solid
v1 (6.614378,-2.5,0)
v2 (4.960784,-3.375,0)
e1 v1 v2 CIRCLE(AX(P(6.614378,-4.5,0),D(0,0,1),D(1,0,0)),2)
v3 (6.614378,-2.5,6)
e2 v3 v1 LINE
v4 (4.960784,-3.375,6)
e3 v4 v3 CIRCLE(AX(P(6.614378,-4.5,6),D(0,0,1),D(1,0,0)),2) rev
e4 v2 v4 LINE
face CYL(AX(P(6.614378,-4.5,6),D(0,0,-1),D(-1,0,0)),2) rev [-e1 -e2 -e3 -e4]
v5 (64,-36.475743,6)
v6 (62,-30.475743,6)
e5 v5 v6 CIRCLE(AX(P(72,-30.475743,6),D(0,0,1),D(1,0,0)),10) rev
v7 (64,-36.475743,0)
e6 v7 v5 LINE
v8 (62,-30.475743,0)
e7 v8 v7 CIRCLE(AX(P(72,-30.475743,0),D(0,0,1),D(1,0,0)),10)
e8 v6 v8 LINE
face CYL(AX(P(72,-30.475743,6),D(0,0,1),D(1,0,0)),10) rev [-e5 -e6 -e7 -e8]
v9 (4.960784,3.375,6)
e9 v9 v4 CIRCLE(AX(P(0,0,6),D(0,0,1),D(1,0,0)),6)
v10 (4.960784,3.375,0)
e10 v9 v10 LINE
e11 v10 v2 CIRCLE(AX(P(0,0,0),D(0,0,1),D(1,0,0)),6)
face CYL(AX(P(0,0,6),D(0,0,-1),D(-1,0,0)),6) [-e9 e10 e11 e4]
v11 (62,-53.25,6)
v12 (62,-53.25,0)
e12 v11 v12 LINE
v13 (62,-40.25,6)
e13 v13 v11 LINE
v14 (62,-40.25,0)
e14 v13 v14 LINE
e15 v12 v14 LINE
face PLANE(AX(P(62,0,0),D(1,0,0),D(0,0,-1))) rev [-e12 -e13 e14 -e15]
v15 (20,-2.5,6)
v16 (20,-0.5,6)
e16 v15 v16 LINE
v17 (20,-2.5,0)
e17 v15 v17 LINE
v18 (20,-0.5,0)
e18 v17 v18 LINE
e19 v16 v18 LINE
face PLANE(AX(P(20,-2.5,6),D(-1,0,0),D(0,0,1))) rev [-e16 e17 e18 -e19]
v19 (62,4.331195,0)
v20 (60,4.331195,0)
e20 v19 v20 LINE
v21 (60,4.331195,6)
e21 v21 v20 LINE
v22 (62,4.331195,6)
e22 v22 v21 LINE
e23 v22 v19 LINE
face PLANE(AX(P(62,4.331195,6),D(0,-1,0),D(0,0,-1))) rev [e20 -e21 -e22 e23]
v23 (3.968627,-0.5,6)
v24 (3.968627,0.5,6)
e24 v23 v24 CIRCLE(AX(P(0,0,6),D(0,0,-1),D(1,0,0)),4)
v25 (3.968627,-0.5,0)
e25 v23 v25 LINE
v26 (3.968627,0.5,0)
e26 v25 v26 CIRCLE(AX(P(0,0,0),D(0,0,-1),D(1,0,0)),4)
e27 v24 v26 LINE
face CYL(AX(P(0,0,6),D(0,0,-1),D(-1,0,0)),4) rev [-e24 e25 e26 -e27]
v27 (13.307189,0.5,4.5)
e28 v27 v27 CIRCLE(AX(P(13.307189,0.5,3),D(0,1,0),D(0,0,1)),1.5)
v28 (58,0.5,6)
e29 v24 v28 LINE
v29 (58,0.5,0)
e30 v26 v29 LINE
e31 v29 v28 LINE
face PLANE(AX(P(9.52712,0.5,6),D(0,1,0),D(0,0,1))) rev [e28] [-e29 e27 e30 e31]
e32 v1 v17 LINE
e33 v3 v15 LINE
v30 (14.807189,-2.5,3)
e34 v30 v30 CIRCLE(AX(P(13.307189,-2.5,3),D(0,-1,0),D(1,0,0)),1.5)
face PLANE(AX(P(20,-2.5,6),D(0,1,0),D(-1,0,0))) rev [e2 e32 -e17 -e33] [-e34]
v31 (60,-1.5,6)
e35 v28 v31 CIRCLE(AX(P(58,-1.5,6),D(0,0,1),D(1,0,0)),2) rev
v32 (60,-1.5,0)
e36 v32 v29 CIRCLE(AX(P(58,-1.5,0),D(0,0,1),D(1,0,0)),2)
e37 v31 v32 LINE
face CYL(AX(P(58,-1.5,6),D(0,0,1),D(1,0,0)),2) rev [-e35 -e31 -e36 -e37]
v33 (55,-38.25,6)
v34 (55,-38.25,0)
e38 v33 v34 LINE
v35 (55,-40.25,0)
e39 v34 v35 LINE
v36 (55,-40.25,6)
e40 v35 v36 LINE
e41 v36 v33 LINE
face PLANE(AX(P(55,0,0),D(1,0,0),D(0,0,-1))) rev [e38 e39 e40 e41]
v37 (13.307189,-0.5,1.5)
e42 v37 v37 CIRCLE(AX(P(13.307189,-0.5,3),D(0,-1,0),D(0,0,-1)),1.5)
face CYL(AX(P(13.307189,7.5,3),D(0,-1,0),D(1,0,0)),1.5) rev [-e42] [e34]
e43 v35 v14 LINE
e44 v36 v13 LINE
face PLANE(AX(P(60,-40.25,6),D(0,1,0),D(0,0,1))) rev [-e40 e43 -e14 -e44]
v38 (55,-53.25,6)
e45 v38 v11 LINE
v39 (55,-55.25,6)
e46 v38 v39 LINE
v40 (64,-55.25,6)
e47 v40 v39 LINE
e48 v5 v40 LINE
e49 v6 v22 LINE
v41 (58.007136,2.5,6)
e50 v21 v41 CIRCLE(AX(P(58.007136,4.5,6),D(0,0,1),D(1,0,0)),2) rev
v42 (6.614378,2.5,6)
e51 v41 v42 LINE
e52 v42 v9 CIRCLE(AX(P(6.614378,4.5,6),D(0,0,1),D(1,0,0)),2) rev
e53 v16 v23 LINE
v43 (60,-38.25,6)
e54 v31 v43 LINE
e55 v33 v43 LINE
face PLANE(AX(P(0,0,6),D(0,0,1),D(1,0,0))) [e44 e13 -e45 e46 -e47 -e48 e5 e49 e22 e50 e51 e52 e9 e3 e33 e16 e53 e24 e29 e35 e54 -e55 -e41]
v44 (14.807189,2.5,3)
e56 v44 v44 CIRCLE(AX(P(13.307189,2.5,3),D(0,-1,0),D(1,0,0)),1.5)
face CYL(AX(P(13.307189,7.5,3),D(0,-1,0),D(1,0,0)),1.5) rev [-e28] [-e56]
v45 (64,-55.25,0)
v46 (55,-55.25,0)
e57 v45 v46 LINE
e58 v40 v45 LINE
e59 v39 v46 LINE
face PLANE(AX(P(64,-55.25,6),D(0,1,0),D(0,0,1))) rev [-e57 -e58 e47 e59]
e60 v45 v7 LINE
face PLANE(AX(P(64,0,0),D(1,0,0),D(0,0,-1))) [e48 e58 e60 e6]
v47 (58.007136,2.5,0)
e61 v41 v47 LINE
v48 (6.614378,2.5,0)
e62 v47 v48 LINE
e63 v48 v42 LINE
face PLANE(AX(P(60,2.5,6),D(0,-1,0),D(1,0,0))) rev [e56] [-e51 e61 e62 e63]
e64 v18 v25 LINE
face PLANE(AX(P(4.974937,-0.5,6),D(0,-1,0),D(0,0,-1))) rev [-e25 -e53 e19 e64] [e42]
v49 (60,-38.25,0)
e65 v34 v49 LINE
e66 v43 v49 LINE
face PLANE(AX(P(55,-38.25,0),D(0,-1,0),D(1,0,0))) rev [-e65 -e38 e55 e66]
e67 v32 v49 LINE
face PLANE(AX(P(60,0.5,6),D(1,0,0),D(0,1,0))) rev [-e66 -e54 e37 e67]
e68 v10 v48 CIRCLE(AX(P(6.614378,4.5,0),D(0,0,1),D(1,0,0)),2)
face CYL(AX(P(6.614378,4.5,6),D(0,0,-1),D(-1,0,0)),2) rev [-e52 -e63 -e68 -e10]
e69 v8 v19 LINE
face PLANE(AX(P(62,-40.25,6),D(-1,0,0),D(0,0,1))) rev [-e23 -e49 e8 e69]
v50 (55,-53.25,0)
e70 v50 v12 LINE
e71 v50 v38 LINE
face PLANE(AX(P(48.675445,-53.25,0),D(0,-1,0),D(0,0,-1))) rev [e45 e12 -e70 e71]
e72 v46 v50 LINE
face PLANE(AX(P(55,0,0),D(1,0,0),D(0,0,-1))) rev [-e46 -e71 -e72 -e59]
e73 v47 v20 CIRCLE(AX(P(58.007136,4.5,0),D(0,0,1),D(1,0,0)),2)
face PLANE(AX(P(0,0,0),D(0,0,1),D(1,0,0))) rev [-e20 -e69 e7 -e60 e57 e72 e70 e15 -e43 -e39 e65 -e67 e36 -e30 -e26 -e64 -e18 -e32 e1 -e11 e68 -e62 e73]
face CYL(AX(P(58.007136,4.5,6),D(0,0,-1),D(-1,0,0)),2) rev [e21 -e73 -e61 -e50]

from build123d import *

# Parameters (mm, degrees)
BOSS_EXTRUDE1_DEPTH = 6
FILLET1_R           = 2
SKETCH2_R           = 1.5
CUT_EXTRUDE1_DEPTH  = 10
SKETCH3_W           = 6
SKETCH3_H           = 18.774257397
BOSS_EXTRUDE2_DEPTH = 2
FILLET2_R           = 10
SKETCH4_W           = 6
SKETCH4_H           = 2
BOSS_EXTRUDE3_DEPTH = 5
SKETCH5_W           = 6
SKETCH5_H           = 2
BOSS_EXTRUDE4_DEPTH = 7


with BuildPart() as part:
    # Sketch1 → Boss-Extrude1 (new body)
    with BuildSketch(Plane.XY):
        with BuildLine():
            Line((4.974937186, 0.5), (9.527119886, 0.5))
            Line((9.527119886, 0.5), (60, 0.5))
            Line((60, 0.5), (60, -40.25))
            Line((60, -40.25), (62, -40.25))
            Line((62, -40.25), (62, 4.331195296))
            Line((62, 4.331195296), (60, 4.331195296))
            Line((60, 4.331195296), (60, 2.5))
            Line((60, 2.5), (5.454356057, 2.5))
            ThreePointArc((5.454356057, 2.5), (-6, 0), (5.454356057, -2.5))
            Line((5.454356057, -2.5), (20, -2.5))
            Line((20, -2.5), (20, -0.5))
            Line((20, -0.5), (4.974937186, -0.5))
            Line((4.974937186, -0.5), (3.968626967, -0.5))
            ThreePointArc((3.968626967, -0.5), (-4, 0), (3.968626967, 0.5))
            Line((3.968626967, 0.5), (4.974937186, 0.5))
        make_face()
    extrude(amount=BOSS_EXTRUDE1_DEPTH)

    # Fillet1
    # the kernel refuses this fillet: 2 mm, written as the material it adds along each edge
    with BuildSketch(Plane(origin=(5.454356057, -2.5, 0), x_dir=(1, 0, 0), z_dir=(0, 0, 1))) as fillet1_piece_1:
        with BuildLine():
            CenterArc((1.16002222, -2), FILLET1_R, 90, 55.771133672)
            Line((-0.493572349, -0.875), (-0.52664424, -0.8525))
            ThreePointArc((-0.52664424, -0.8525), (-0.26328023, -0.428195989), (-0.036362374, 0.016666667))
            Line((-0.036362374, 0.016666667), (0, 0.04))
            Line((0, 0.04), (1.16002222, 0.04))
            Line((1.16002222, 0.04), (1.16002222, 0))
        make_face()
    extrude(amount=6)
    with BuildSketch(Plane(origin=(5.454356057, 2.5, 0), x_dir=(-0.491308051869414, 0.8709858771348026, 0), z_dir=(0, 0, 1))) as fillet1_piece_2:
        with BuildLine():
            CenterArc((1.172043497, -1.992979075), FILLET1_R, 94.802273988, 55.771133672)
            Line((-0.569928257, -1.010362971), (-0.604767692, -0.990710649))
            Line((-0.604767692, -0.990710649), (-0.034839435, 0.019652322))
            Line((-0.034839435, 0.019652322), (0.003348696, 0.039859581))
            ThreePointArc((0.003348696, 0.039859581), (0.502304356, 0.018937224), (1.001260016, 0.039859581))
            Line((1.001260016, 0.039859581), (1.004608712, 0))
        make_face()
    extrude(amount=6)
    with BuildSketch(Plane(origin=(60, 2.5, 0), x_dir=(-1, 0, 0), z_dir=(0, 0, 1))) as fillet1_piece_3:
        with BuildLine():
            CenterArc((1.992863511, -2), FILLET1_R, 90, 85.158341327)
            Line((0, -1.831195296), (-0.03985727, -1.827819202))
            ThreePointArc((-0.03985727, -1.827819202), (-0.04, -0.915597648), (-0.04, 0))
            Line((-0.04, 0), (0, 0.04))
            Line((0, 0.04), (1.992863511, 0.04))
            Line((1.992863511, 0.04), (1.992863511, 0))
        make_face()
    extrude(amount=6)
    with BuildSketch(Plane(origin=(60, 0.5, 0), x_dir=(-1, 0, 0), z_dir=(0, 0, 1))) as fillet1_piece_4:
        with BuildLine():
            CenterArc((FILLET1_R, FILLET1_R), FILLET1_R, 180, 90)
            Line((0, FILLET1_R), (-FILLET1_R * 0.02, FILLET1_R))
            Line((-FILLET1_R * 0.02, FILLET1_R), (-FILLET1_R * 0.02, -FILLET1_R * 0.02))
            Line((-FILLET1_R * 0.02, -FILLET1_R * 0.02), (FILLET1_R, -FILLET1_R * 0.02))
            Line((FILLET1_R, -FILLET1_R * 0.02), (FILLET1_R, 0))
        make_face()
    extrude(amount=6)

    # Sketch2 → Cut-Extrude1 (cut)
    with BuildSketch(Plane.XZ.offset(2.5)):
        with Locations((13.307189139, 3)):
            Circle(SKETCH2_R)
    extrude(amount=-CUT_EXTRUDE1_DEPTH, mode=Mode.SUBTRACT)

    # Sketch3 → Boss-Extrude2 (add)
    with BuildSketch(Plane(origin=(62, 0, 0), x_dir=(0, 0, -1), z_dir=(1, 0, 0))):
        with Locations((-3, -45.862871302)):
            Rectangle(SKETCH3_W, SKETCH3_H)
    extrude(amount=BOSS_EXTRUDE2_DEPTH)

    # Fillet2
    # the kernel refuses this fillet: 10 mm, written as the material it adds along each edge
    with BuildSketch(Plane(origin=(62, -36.475742603, 6), x_dir=(0, 1, 0), z_dir=(0, 0, -1))) as fillet2_piece_1:
        with BuildLine():
            CenterArc((6, 10), FILLET2_R, 233.130102354, 36.869897646)
            Line((0, 2), (-0.12, 1.84))
            ThreePointArc((-0.12, 1.84), (-0.2, 1), (-0.2, 0))
            Line((-0.2, 0), (0, -0.2))
            Line((0, -0.2), (6, -0.2))
            Line((6, -0.2), (6, 0))
        make_face()
    extrude(amount=6)

    # Sketch4 → Boss-Extrude3 (add)
    with BuildSketch(Plane.ZY.offset(-60)):
        with Locations((3, -39.25)):
            Rectangle(SKETCH4_W, SKETCH4_H)
    extrude(amount=BOSS_EXTRUDE3_DEPTH)

    # Sketch5 → Boss-Extrude4 (add)
    with BuildSketch(Plane.ZY.offset(-62)):
        with Locations((3, -54.25)):
            Rectangle(SKETCH5_W, SKETCH5_H)
    extrude(amount=BOSS_EXTRUDE4_DEPTH)


solid = part.part
